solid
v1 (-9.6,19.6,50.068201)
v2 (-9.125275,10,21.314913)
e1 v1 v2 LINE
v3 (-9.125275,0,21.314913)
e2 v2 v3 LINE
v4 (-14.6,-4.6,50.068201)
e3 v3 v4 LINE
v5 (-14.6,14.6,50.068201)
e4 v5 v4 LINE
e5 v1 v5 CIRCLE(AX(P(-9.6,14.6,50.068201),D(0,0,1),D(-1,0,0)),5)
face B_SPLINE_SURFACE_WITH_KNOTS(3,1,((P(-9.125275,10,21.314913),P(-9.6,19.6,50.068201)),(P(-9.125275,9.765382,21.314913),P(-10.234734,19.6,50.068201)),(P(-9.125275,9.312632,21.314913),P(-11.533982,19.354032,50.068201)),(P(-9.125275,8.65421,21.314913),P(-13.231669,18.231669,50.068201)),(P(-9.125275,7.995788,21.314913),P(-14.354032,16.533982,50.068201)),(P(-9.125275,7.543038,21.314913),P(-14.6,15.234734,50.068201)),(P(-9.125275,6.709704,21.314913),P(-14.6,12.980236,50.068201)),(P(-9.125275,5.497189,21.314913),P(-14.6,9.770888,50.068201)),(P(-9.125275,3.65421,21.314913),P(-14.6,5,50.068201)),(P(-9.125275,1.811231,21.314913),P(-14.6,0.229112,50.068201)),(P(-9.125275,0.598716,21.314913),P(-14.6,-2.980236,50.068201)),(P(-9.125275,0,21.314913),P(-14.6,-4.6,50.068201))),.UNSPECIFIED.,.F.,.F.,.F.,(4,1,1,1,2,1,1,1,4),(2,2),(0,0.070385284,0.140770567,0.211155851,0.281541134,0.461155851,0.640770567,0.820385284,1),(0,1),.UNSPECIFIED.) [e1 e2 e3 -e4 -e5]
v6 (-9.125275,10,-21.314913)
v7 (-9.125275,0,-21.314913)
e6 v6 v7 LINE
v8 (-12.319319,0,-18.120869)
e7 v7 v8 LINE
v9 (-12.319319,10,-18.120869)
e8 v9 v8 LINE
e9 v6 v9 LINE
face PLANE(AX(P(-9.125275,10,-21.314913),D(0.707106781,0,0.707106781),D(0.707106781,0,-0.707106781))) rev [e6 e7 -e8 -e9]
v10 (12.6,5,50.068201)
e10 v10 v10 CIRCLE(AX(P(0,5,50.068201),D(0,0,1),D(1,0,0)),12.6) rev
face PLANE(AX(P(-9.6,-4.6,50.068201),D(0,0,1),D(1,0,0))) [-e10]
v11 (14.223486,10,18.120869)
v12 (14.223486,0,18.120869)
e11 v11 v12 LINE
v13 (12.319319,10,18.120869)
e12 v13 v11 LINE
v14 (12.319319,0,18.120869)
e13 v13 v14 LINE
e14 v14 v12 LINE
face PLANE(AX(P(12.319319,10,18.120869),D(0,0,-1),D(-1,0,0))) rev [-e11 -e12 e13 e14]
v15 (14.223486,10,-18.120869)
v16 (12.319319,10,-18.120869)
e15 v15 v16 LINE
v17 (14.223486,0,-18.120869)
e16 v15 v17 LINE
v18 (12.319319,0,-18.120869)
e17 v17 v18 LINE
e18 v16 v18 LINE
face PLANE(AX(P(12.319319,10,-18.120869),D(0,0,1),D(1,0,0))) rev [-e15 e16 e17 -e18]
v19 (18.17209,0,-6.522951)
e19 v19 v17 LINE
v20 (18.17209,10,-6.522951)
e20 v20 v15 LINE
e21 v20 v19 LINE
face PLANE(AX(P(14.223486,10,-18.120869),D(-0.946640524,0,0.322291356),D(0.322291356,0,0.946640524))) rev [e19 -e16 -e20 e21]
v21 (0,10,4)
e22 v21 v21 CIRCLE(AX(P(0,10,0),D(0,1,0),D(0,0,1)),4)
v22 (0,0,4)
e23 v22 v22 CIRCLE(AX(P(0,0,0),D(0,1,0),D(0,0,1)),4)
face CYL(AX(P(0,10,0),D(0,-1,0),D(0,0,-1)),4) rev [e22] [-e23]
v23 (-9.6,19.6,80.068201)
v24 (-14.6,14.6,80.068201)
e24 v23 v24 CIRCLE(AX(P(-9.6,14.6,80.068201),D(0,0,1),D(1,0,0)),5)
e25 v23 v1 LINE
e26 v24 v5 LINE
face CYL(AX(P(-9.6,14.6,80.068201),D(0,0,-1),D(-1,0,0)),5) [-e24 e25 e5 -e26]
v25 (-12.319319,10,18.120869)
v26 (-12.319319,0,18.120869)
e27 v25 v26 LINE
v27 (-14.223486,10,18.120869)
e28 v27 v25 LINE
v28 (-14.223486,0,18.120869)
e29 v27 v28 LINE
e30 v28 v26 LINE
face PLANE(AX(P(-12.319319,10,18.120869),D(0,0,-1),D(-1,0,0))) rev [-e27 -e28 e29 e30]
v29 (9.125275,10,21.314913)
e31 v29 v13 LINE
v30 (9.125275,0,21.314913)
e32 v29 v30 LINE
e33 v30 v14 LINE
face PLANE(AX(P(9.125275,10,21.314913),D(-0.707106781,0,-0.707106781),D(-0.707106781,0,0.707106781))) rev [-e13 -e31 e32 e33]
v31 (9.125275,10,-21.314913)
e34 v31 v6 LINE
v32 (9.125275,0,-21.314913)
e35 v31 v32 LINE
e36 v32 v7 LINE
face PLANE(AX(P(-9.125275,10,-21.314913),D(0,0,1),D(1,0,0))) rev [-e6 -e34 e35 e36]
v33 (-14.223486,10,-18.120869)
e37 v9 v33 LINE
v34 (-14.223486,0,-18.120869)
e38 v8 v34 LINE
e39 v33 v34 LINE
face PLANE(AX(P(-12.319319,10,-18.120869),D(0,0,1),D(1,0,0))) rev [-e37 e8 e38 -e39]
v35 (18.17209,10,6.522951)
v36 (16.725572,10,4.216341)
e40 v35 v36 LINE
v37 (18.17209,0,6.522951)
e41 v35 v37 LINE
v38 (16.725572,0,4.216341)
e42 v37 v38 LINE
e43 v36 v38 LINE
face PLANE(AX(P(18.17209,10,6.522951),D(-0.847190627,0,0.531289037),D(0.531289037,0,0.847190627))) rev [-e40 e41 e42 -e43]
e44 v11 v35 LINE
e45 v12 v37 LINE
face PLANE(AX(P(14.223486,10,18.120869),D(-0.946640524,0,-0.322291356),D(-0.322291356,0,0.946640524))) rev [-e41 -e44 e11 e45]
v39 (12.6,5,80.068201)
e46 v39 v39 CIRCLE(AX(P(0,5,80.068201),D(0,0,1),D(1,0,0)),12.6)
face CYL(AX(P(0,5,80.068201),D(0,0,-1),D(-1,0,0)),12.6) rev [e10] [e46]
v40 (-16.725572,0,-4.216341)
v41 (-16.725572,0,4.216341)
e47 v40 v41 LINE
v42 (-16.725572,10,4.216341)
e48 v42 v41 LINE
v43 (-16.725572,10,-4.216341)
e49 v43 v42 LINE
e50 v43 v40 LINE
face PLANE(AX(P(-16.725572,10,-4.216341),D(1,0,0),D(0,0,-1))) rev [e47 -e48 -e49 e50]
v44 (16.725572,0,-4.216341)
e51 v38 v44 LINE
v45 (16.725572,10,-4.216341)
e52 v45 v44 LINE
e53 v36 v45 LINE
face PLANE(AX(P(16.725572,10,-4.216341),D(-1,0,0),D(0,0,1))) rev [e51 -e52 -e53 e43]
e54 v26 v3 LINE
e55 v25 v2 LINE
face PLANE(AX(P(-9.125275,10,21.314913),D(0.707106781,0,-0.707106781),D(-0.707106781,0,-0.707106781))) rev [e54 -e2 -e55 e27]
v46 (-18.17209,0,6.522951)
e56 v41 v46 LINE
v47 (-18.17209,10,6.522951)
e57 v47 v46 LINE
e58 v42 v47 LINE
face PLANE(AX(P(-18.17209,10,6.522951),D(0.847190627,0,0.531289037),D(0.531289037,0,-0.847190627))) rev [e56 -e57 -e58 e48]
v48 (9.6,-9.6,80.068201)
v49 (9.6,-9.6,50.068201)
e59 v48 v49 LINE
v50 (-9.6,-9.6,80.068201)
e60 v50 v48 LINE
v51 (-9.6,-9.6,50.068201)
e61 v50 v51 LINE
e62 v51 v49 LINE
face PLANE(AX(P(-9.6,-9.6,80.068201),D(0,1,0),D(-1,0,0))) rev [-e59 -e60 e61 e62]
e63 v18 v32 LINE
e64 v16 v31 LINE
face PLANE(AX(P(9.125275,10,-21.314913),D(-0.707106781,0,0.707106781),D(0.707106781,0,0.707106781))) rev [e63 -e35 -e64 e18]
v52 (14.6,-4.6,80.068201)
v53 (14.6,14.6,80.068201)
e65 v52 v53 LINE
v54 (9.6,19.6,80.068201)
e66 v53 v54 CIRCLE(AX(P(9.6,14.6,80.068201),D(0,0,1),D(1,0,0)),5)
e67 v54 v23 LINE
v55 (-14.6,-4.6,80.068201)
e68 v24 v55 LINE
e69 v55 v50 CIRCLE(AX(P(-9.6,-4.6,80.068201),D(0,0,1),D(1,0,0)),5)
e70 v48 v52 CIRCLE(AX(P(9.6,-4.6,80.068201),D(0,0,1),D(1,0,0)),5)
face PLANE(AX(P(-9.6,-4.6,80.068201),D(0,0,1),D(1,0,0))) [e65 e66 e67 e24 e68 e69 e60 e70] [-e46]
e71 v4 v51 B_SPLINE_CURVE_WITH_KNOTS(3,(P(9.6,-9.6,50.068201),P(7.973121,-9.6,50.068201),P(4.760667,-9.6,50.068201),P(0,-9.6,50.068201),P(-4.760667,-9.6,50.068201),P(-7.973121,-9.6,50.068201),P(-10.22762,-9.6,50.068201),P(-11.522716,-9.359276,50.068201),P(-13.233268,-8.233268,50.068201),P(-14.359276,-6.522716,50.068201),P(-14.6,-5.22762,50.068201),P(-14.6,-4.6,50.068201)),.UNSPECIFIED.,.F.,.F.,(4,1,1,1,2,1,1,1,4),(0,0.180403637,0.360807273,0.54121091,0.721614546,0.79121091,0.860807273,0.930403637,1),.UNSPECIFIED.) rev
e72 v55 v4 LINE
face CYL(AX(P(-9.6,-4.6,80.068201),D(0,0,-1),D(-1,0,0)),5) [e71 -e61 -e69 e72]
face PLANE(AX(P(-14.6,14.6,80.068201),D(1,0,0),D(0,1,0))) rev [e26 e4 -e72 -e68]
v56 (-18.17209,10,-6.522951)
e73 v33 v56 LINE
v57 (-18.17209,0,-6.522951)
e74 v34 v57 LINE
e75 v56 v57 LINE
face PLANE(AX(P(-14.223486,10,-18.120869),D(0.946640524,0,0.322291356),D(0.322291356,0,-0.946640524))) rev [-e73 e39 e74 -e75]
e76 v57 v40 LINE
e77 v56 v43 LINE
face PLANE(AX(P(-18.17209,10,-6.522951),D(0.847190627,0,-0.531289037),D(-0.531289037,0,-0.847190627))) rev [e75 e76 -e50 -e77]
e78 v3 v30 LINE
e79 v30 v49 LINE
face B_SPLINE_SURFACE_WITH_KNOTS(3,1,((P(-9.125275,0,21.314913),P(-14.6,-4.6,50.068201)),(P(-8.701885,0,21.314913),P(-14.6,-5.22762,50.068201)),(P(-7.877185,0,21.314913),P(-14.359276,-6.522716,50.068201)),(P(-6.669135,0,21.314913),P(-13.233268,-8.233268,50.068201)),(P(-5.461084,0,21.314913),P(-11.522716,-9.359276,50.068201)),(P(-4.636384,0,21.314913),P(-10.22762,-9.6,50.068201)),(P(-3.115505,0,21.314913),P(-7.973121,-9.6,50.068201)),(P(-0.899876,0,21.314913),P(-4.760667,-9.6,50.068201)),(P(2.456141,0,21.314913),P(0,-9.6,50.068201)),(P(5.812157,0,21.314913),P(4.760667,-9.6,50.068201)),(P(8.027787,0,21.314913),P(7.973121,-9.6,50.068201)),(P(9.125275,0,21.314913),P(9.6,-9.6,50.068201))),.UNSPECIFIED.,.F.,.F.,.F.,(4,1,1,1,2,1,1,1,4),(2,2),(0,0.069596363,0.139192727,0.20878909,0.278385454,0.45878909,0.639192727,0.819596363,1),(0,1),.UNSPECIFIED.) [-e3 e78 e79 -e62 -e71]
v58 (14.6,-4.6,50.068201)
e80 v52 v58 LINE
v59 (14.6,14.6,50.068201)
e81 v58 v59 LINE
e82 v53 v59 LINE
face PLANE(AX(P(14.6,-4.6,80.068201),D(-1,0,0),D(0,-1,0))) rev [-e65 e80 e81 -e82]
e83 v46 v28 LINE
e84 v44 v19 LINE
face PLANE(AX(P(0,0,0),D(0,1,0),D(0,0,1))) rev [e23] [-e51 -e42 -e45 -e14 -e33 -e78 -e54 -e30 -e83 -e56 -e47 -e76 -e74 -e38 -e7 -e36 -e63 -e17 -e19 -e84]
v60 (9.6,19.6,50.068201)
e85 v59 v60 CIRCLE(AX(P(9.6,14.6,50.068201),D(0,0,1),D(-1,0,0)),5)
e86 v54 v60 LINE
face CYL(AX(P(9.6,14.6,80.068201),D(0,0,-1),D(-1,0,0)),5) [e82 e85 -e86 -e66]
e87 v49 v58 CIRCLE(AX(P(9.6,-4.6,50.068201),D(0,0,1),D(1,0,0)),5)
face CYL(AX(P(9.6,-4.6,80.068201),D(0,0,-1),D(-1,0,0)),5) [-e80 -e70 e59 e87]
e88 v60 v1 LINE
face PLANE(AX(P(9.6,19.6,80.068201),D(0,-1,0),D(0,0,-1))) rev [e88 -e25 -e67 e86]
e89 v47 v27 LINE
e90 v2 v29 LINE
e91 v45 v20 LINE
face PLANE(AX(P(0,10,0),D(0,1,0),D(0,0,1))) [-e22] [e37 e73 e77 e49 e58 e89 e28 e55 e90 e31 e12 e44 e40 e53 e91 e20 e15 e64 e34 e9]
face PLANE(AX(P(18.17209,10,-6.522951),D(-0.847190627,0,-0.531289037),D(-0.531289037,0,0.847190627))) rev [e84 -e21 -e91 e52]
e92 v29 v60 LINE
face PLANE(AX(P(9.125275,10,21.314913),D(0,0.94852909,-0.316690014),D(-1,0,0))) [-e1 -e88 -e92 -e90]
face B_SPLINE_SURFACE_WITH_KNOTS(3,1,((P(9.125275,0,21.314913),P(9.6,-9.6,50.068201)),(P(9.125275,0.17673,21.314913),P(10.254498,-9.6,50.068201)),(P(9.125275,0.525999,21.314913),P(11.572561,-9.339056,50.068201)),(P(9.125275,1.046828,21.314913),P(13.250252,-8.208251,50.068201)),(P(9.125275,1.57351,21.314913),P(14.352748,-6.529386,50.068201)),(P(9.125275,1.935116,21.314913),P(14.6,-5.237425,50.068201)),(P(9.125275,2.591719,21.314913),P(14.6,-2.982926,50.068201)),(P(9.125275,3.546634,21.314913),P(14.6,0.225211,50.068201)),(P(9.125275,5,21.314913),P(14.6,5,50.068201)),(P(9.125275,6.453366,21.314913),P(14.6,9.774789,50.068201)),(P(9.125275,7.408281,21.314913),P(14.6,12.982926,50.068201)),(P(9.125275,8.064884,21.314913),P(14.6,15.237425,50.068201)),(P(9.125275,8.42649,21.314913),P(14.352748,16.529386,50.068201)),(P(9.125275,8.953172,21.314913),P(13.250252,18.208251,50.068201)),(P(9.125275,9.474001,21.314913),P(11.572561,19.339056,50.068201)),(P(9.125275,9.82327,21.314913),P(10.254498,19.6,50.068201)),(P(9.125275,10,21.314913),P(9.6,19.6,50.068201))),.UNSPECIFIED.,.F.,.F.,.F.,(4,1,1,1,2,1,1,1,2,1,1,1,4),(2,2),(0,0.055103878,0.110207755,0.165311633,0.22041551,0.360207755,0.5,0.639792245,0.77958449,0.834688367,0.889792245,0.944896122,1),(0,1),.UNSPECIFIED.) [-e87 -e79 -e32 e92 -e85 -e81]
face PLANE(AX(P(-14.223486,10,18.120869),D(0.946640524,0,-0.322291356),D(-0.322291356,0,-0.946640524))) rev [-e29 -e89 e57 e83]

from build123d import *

# Parameters (mm, degrees)
SKETCH8_R           = 4
BOSS_EXTRUDE1_DEPTH = 10
SKETCH10_R          = 12.6
BOSS_EXTRUDE2_DEPTH = 30


with BuildPart() as part:
    # Sketch8 → Boss-Extrude1 (new body)
    with BuildSketch(Plane(origin=(0, 0, 0), x_dir=(1, 0, 0), z_dir=(0, 1, 0))):
        Polygon((-9.12527543, 21.31491274), (9.12527543, 21.31491274), (12.319319476, 18.120868694), (14.223486177, 18.120868694), (18.172090162, 6.522951249), (16.725571871, 4.216341001), (16.725571871, -4.216341001), (18.172090162, -6.522951249), (14.223486177, -18.120868694), (12.319319476, -18.120868694), (9.12527543, -21.31491274), (-9.12527543, -21.31491274), (-12.319319476, -18.120868694), (-14.223486177, -18.120868694), (-18.172090162, -6.522951249), (-16.725571871, -4.216341001), (-16.725571871, 4.216341001), (-18.172090162, 6.522951249), (-14.223486177, 18.120868694), (-12.319319476, 18.120868694), align=None)
        with Locations(Location((0, 0, 0), (0, 0, 270))):
            Circle(SKETCH8_R, mode=Mode.SUBTRACT)
    extrude(amount=BOSS_EXTRUDE1_DEPTH)

    # Loft1: read off the stored shape, not the designer's step
    # Loft1: loft between two sections, ruled curve by curve
    loft1_from = [
        Edge.make_bspline([(-9.12527543, 10, 21.31491274), (-9.12527543, 9.765382388, 21.31491274), (-9.12527543, 9.312631807, 21.31491274), (-9.12527543, 8.654210049, 21.31491274), (-9.12527543, 7.995788292, 21.31491274), (-9.12527543, 7.54303771, 21.31491274), (-9.12527543, 6.709704377, 21.31491274), (-9.12527543, 5.497189101, 21.31491274), (-9.12527543, 3.654210049, 21.31491274), (-9.12527543, 1.811230997, 21.31491274), (-9.12527543, 0.598715722, 21.31491274), (-9.12527543, 0, 21.31491274)], [0, 0, 0, 0, 0.070385284, 0.140770567, 0.211155851, 0.281541134, 0.281541134, 0.461155851, 0.640770567, 0.820385284, 1, 1, 1, 1], 3),
        Edge.make_bspline([(-9.12527543, 0, 21.31491274), (-8.701884774, 0, 21.31491274), (-7.877185435, 0, 21.31491274), (-6.669134636, 0, 21.31491274), (-5.461083837, 0, 21.31491274), (-4.636384498, 0, 21.31491274), (-3.11550526, 0, 21.31491274), (-0.899875875, 0, 21.31491274), (2.456140795, 0, 21.31491274), (5.812157464, 0, 21.31491274), (8.027786849, 0, 21.31491274), (9.12527543, 0, 21.31491274)], [0, 0, 0, 0, 0.069596363, 0.139192727, 0.20878909, 0.278385454, 0.278385454, 0.45878909, 0.639192727, 0.819596363, 1, 1, 1, 1], 3),
        Edge.make_bspline([(9.12527543, 0, 21.31491274), (9.12527543, 0.176730026, 21.31491274), (9.12527543, 0.525998676, 21.31491274), (9.12527543, 1.046828191, 21.31491274), (9.12527543, 1.573509956, 21.31491274), (9.12527543, 1.935115843, 21.31491274), (9.12527543, 2.59171915, 21.31491274), (9.12527543, 3.546633632, 21.31491274), (9.12527543, 5, 21.31491274), (9.12527543, 6.453366368, 21.31491274), (9.12527543, 7.40828085, 21.31491274), (9.12527543, 8.064884157, 21.31491274), (9.12527543, 8.426490044, 21.31491274), (9.12527543, 8.953171809, 21.31491274), (9.12527543, 9.474001324, 21.31491274), (9.12527543, 9.823269974, 21.31491274), (9.12527543, 10, 21.31491274)], [0, 0, 0, 0, 0.055103878, 0.110207755, 0.165311633, 0.22041551, 0.22041551, 0.360207755, 0.5, 0.639792245, 0.77958449, 0.77958449, 0.834688367, 0.889792245, 0.944896122, 1, 1, 1, 1], 3),
        Edge.make_line((-9.12527543, 10, 21.31491274), (9.12527543, 10, 21.31491274)),
    ]
    loft1_to = [
        Edge.make_bspline([(-9.6, 19.6, 50.06820098), (-10.234734052, 19.6, 50.06820098), (-11.53398235, 19.354031687, 50.06820098), (-13.231668825, 18.231668825, 50.06820098), (-14.354031687, 16.53398235, 50.06820098), (-14.6, 15.234734052, 50.06820098), (-14.6, 12.980235586, 50.06820098), (-14.6, 9.770888451, 50.06820098), (-14.6, 5, 50.06820098), (-14.6, 0.229111549, 50.06820098), (-14.6, -2.980235586, 50.06820098), (-14.6, -4.6, 50.06820098)], [0, 0, 0, 0, 0.070385284, 0.140770567, 0.211155851, 0.281541134, 0.281541134, 0.461155851, 0.640770567, 0.820385284, 1, 1, 1, 1], 3),
        Edge.make_bspline([(-14.6, -4.6, 50.06820098), (-14.6, -5.227619575, 50.06820098), (-14.359276005, -6.522715506, 50.06820098), (-13.233267962, -8.233267962, 50.06820098), (-11.522715506, -9.359276005, 50.06820098), (-10.227619575, -9.6, 50.06820098), (-7.97312111, -9.6, 50.06820098), (-4.760666779, -9.6, 50.06820098), (0, -9.6, 50.06820098), (4.760666779, -9.6, 50.06820098), (7.97312111, -9.6, 50.06820098), (9.6, -9.6, 50.06820098)], [0, 0, 0, 0, 0.069596363, 0.139192727, 0.20878909, 0.278385454, 0.278385454, 0.45878909, 0.639192727, 0.819596363, 1, 1, 1, 1], 3),
        Edge.make_bspline([(9.6, -9.6, 50.06820098), (10.254498465, -9.6, 50.06820098), (11.572560966, -9.339055686, 50.06820098), (13.250251726, -8.208250929, 50.06820098), (14.352747808, -6.529386239, 50.06820098), (14.6, -5.237424723, 50.06820098), (14.6, -2.982926258, 50.06820098), (14.6, 0.22521062, 50.06820098), (14.6, 5, 50.06820098), (14.6, 9.77478938, 50.06820098), (14.6, 12.982926258, 50.06820098), (14.6, 15.237424723, 50.06820098), (14.352747808, 16.529386239, 50.06820098), (13.250251726, 18.208250929, 50.06820098), (11.572560966, 19.339055686, 50.06820098), (10.254498465, 19.6, 50.06820098), (9.6, 19.6, 50.06820098)], [0, 0, 0, 0, 0.055103878, 0.110207755, 0.165311633, 0.22041551, 0.22041551, 0.360207755, 0.5, 0.639792245, 0.77958449, 0.77958449, 0.834688367, 0.889792245, 0.944896122, 1, 1, 1, 1], 3),
        Edge.make_line((-9.6, 19.6, 50.06820098), (9.6, 19.6, 50.06820098)),
    ]
    loft1 = Solid(Shell([*[Face.make_surface_from_curves(loft1_from[k], loft1_to[k]) for k in range(4)], Face(Wire(loft1_from)), Face(Wire(loft1_to))]))
    add(loft1)

    # Sketch10 → Boss-Extrude2 (add)
    with BuildSketch(Plane.XY.offset(50.06820098)):
        with BuildLine():
            Line((-9.6, -9.6), (9.6, -9.6))
            ThreePointArc((9.6, -9.6), (13.135533906, -8.135533906), (14.6, -4.6))
            Line((14.6, -4.6), (14.6, 14.6))
            ThreePointArc((14.6, 14.6), (13.135533906, 18.135533906), (9.6, 19.6))
            Line((9.6, 19.6), (-9.6, 19.6))
            ThreePointArc((-9.6, 19.6), (-13.135533906, 18.135533906), (-14.6, 14.6))
            Line((-14.6, 14.6), (-14.6, -4.6))
            ThreePointArc((-14.6, -4.6), (-13.135533906, -8.135533906), (-9.6, -9.6))
        make_face()
        with Locations((0, 5)):
            Circle(SKETCH10_R, mode=Mode.SUBTRACT)
    extrude(amount=BOSS_EXTRUDE2_DEPTH)


solid = part.part
